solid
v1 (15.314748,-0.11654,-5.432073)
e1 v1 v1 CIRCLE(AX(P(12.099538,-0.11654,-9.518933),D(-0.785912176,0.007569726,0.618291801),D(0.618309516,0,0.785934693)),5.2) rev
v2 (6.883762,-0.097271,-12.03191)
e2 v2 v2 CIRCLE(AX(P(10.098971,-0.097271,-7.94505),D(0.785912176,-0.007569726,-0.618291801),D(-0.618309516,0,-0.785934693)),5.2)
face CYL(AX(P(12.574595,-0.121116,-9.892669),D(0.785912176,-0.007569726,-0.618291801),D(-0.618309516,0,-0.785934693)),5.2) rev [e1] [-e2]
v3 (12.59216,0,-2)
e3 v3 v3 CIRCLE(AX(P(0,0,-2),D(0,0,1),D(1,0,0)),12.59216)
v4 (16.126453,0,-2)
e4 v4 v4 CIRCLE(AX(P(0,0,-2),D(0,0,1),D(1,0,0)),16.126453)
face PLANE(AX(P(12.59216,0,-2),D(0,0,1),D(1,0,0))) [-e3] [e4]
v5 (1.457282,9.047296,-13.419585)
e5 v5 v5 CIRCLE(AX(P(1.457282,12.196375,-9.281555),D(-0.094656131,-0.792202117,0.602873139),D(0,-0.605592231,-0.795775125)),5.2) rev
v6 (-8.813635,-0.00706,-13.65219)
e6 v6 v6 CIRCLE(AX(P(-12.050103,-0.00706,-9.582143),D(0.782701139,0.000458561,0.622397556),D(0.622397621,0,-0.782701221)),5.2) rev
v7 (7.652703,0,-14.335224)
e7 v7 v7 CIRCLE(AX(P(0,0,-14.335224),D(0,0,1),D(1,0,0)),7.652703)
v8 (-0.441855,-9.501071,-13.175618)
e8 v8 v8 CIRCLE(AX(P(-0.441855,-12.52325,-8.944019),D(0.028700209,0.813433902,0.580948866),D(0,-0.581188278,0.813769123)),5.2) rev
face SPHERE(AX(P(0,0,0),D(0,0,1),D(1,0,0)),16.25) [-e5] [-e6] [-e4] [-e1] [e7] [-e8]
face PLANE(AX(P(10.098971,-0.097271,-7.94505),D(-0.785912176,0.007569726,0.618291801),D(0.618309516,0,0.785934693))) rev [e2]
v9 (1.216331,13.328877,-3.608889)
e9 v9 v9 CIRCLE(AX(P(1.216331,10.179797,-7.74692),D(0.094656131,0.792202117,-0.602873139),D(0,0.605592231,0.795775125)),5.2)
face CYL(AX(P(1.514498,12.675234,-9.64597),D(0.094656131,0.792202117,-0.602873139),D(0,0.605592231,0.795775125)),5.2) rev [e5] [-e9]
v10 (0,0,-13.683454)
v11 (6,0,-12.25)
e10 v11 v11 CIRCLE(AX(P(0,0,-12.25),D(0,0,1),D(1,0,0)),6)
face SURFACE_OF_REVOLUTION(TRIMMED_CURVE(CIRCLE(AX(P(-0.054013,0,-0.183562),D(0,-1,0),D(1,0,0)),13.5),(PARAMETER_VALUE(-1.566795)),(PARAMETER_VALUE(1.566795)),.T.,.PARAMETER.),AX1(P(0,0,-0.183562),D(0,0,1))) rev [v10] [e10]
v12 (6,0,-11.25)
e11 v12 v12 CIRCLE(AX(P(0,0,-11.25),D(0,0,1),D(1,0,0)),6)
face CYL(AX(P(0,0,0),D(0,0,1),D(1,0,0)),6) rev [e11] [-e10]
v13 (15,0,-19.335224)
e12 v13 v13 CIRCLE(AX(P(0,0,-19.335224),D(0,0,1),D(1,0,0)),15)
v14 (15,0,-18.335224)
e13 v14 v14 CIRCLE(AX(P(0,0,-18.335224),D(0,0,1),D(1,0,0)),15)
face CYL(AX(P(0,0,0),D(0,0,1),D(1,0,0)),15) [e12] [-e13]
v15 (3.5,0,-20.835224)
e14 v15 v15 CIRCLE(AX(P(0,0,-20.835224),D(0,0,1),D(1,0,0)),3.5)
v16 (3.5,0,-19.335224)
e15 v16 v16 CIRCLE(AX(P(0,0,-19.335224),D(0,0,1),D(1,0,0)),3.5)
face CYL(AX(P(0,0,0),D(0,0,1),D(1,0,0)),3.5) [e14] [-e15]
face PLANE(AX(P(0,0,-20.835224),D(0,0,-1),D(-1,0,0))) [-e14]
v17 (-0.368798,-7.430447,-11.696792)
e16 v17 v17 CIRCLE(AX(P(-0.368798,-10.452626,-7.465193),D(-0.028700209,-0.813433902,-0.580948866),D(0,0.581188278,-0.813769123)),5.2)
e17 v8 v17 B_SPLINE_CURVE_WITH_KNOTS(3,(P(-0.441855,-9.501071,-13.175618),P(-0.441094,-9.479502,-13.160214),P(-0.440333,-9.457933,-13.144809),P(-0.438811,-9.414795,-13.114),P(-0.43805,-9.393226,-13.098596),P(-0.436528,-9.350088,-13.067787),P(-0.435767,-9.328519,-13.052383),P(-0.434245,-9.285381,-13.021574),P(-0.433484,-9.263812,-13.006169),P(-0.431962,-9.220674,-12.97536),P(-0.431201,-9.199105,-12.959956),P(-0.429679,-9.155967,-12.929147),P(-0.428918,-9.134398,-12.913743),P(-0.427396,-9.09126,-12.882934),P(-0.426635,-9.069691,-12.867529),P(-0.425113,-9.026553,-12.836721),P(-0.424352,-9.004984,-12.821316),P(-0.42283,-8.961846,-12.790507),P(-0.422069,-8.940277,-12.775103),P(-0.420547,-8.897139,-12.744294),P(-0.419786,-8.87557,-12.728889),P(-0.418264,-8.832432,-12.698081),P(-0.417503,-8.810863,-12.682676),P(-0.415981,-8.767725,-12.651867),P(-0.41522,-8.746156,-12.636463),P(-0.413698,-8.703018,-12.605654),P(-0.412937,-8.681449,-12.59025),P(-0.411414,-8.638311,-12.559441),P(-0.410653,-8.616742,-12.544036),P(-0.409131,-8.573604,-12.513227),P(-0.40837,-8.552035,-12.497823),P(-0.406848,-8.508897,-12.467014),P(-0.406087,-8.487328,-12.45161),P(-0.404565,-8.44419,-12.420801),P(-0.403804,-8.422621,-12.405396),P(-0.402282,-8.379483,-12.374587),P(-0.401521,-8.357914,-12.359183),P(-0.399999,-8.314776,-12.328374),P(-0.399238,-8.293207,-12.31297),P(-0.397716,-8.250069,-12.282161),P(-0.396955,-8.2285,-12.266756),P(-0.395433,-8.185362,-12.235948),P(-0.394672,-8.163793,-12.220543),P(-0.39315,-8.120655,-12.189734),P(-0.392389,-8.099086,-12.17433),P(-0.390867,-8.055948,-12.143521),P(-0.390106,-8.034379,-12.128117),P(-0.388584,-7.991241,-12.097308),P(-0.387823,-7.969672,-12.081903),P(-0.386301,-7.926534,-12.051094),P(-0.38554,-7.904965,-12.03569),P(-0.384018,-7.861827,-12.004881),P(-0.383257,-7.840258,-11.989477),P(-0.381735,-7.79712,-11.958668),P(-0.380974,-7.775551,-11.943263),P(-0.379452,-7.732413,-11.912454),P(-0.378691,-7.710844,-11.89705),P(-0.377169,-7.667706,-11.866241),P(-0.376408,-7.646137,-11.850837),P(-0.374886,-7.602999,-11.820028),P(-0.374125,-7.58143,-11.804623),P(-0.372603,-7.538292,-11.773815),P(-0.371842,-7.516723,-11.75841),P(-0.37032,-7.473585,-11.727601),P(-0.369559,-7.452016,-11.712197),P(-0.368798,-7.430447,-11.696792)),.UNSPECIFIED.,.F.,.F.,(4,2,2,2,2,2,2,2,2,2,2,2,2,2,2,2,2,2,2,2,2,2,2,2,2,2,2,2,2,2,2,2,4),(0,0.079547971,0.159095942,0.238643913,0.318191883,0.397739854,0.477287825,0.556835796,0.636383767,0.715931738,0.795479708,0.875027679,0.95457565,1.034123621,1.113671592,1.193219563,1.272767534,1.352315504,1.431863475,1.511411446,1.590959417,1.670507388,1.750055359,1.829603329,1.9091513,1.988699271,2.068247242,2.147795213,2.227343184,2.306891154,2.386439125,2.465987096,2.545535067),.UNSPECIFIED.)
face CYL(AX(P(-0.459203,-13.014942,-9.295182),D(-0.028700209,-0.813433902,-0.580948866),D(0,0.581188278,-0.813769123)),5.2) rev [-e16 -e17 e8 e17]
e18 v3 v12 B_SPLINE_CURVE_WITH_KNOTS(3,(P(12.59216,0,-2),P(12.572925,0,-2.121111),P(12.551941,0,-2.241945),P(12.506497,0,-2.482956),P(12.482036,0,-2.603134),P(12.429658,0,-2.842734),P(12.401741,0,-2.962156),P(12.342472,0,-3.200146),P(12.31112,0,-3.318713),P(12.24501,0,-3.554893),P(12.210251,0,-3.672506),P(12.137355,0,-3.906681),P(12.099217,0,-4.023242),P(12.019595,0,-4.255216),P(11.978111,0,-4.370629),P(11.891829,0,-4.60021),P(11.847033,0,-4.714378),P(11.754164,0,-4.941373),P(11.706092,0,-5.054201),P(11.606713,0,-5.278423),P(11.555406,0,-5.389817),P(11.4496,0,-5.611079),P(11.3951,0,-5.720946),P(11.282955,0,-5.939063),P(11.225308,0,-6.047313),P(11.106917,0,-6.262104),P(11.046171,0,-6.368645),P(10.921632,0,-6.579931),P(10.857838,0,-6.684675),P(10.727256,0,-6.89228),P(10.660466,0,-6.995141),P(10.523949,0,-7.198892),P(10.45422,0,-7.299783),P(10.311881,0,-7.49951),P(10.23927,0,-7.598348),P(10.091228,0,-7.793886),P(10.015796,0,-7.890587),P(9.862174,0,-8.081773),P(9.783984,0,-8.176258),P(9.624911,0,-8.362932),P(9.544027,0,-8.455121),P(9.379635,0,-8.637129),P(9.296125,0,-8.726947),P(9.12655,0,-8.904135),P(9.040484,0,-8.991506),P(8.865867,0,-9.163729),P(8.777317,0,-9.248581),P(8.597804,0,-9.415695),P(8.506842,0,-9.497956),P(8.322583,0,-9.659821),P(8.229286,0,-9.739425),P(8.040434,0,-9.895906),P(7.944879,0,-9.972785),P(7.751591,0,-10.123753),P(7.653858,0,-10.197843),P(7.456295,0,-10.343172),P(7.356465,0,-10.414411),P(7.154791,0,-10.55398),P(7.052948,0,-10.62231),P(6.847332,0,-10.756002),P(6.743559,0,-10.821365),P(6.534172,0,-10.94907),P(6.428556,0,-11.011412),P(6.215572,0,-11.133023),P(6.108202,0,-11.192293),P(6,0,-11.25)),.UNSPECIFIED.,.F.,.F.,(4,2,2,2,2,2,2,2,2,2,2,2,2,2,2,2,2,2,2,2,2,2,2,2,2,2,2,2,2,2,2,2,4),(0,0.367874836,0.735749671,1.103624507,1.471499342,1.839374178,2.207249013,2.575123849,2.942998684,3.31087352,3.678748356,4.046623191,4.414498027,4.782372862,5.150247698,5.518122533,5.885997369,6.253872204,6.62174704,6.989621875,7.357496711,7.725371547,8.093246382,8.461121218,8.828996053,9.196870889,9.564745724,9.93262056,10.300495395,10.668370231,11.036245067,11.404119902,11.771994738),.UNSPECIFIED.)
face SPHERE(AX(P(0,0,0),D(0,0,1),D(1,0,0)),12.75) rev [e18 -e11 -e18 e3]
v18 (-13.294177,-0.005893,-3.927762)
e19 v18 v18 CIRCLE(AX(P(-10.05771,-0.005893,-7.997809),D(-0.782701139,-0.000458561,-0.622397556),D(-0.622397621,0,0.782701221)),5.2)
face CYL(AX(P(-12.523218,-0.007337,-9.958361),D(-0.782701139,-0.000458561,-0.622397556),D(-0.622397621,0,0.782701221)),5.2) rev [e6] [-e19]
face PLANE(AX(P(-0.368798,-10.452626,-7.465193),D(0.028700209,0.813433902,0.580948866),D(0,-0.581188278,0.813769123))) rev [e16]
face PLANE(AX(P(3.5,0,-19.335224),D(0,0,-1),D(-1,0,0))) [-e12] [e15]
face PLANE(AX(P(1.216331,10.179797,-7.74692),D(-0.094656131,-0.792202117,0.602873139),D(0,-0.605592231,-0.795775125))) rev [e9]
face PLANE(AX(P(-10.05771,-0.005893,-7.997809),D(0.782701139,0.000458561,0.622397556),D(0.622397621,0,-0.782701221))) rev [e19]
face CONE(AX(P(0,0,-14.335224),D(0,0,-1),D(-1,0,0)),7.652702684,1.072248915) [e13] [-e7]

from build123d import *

# Parameters (mm, degrees)
F_10_0MM_START                             = 12.85
F_10_0MM_CLEARANCE_DOWEL_HOLE1_OUTLINE_R   = 5.2
F_10_0MM_CLEARANCE_DOWEL_HOLE1_DEPTH       = 3.4
F_10_0MM_CLEARANCE_DOWEL_HOLE1_2_OUTLINE_R = 5.2
F_10_0MM_CLEARANCE_DOWEL_HOLE1_2_DEPTH     = 3.4
F_10_0MM_START_2                           = -16.25
F_10_0MM_CLEARANCE_DOWEL_HOLE1_3_OUTLINE_R = 5.2
F_10_0MM_CLEARANCE_DOWEL_HOLE1_3_DEPTH     = 3.4
F_10_0MM_CLEARANCE_DOWEL_HOLE1_4_OUTLINE_R = 5.2
F_10_0MM_CLEARANCE_DOWEL_HOLE1_4_DEPTH     = 3.4


# Read off the part's stored shape, not the designer's step: Ø10.0mm Clearance Dowel Hole1
with BuildPart() as part:
    # Sketch2 → Revolve1 (revolve)
    with BuildSketch(Plane(origin=(0, 0, 0), x_dir=(1, 0, 0), z_dir=(0, 1, 0))):
        with BuildLine():
            Line((0, 19.335223808), (0, 20.835223808))
            Line((0, 20.835223808), (3.5, 20.835223808))
            Line((3.5, 20.835223808), (3.5, 19.335223808))
            Line((3.5, 19.335223808), (15, 19.335223808))
            Line((15, 19.335223808), (15, 18.335223808))
            Line((15, 18.335223808), (7.652702684, 14.335223808))
            ThreePointArc((7.652702684, 14.335223808), (13.394084623, 9.201141077), (16.126453423, 2))
            Line((16.126453423, 2), (12.592160259, 2))
            ThreePointArc((12.592160259, 2), (10.383050167, 7.399646561), (6, 11.25))
            Line((6, 11.25), (6, 12.25))
            ThreePointArc((6, 12.25), (3.082974877, 13.314034437), (0, 13.683453923))
            Line((0, 13.683453923), (0, 14.335223808))
            Line((0, 14.335223808), (0, 19.335223808))
        make_face()
    revolve(axis=Axis((0, 0, 0), (0, 0, -1)))

    # Ø10.0mm Clearance Dowel Hole1 outline → Ø10.0mm Clearance Dowel Hole1 (cut)
    with BuildSketch(Plane(origin=(0, 0, 0), x_dir=(0.6183381372049325, 0.009621176242523823, 0.7858532821370949), z_dir=(0.7859121758046087, -0.0075697264639421865, -0.6182918009834247)).offset(F_10_0MM_START)):
        Circle(F_10_0MM_CLEARANCE_DOWEL_HOLE1_OUTLINE_R)
    extrude(amount=F_10_0MM_CLEARANCE_DOWEL_HOLE1_DEPTH, mode=Mode.SUBTRACT)

    # 10.0mm Clearance Dowel Hole1 2 outline → 10.0mm Clearance Dowel Hole1 2 (cut)
    with BuildSketch(Plane(origin=(0, 0, 0), x_dir=(0.9955100285365741, -0.07532499424889044, 0.05732301740587202), z_dir=(0.094656130721202, 0.792202117315513, -0.602873139422971)).offset(F_10_0MM_START)):
        Circle(F_10_0MM_CLEARANCE_DOWEL_HOLE1_2_OUTLINE_R)
    extrude(amount=F_10_0MM_CLEARANCE_DOWEL_HOLE1_2_DEPTH, mode=Mode.SUBTRACT)

    # 10.0mm Clearance Dowel Hole1 3 outline → 10.0mm Clearance Dowel Hole1 3 (cut)
    with BuildSketch(Plane(origin=(0, 0, 0), x_dir=(0.6223977246894614, -0.0005766674334576965, -0.7827009261244378), z_dir=(0.7827011385588891, 0.00045856135989200104, 0.6223975557632742)).offset(F_10_0MM_START_2)):
        Circle(F_10_0MM_CLEARANCE_DOWEL_HOLE1_3_OUTLINE_R)
    extrude(amount=F_10_0MM_CLEARANCE_DOWEL_HOLE1_3_DEPTH, mode=Mode.SUBTRACT)

    # 10.0mm Clearance Dowel Hole1 4 outline → 10.0mm Clearance Dowel Hole1 4 (cut)
    with BuildSketch(Plane(origin=(0, 0, 0), x_dir=(0.9995880641663693, -0.02335534361896009, -0.0166802248357377), z_dir=(0.02870020864262942, 0.8134339024051715, 0.5809488655998595)).offset(F_10_0MM_START_2)):
        Circle(F_10_0MM_CLEARANCE_DOWEL_HOLE1_4_OUTLINE_R)
    extrude(amount=F_10_0MM_CLEARANCE_DOWEL_HOLE1_4_DEPTH, mode=Mode.SUBTRACT)


solid = part.part
